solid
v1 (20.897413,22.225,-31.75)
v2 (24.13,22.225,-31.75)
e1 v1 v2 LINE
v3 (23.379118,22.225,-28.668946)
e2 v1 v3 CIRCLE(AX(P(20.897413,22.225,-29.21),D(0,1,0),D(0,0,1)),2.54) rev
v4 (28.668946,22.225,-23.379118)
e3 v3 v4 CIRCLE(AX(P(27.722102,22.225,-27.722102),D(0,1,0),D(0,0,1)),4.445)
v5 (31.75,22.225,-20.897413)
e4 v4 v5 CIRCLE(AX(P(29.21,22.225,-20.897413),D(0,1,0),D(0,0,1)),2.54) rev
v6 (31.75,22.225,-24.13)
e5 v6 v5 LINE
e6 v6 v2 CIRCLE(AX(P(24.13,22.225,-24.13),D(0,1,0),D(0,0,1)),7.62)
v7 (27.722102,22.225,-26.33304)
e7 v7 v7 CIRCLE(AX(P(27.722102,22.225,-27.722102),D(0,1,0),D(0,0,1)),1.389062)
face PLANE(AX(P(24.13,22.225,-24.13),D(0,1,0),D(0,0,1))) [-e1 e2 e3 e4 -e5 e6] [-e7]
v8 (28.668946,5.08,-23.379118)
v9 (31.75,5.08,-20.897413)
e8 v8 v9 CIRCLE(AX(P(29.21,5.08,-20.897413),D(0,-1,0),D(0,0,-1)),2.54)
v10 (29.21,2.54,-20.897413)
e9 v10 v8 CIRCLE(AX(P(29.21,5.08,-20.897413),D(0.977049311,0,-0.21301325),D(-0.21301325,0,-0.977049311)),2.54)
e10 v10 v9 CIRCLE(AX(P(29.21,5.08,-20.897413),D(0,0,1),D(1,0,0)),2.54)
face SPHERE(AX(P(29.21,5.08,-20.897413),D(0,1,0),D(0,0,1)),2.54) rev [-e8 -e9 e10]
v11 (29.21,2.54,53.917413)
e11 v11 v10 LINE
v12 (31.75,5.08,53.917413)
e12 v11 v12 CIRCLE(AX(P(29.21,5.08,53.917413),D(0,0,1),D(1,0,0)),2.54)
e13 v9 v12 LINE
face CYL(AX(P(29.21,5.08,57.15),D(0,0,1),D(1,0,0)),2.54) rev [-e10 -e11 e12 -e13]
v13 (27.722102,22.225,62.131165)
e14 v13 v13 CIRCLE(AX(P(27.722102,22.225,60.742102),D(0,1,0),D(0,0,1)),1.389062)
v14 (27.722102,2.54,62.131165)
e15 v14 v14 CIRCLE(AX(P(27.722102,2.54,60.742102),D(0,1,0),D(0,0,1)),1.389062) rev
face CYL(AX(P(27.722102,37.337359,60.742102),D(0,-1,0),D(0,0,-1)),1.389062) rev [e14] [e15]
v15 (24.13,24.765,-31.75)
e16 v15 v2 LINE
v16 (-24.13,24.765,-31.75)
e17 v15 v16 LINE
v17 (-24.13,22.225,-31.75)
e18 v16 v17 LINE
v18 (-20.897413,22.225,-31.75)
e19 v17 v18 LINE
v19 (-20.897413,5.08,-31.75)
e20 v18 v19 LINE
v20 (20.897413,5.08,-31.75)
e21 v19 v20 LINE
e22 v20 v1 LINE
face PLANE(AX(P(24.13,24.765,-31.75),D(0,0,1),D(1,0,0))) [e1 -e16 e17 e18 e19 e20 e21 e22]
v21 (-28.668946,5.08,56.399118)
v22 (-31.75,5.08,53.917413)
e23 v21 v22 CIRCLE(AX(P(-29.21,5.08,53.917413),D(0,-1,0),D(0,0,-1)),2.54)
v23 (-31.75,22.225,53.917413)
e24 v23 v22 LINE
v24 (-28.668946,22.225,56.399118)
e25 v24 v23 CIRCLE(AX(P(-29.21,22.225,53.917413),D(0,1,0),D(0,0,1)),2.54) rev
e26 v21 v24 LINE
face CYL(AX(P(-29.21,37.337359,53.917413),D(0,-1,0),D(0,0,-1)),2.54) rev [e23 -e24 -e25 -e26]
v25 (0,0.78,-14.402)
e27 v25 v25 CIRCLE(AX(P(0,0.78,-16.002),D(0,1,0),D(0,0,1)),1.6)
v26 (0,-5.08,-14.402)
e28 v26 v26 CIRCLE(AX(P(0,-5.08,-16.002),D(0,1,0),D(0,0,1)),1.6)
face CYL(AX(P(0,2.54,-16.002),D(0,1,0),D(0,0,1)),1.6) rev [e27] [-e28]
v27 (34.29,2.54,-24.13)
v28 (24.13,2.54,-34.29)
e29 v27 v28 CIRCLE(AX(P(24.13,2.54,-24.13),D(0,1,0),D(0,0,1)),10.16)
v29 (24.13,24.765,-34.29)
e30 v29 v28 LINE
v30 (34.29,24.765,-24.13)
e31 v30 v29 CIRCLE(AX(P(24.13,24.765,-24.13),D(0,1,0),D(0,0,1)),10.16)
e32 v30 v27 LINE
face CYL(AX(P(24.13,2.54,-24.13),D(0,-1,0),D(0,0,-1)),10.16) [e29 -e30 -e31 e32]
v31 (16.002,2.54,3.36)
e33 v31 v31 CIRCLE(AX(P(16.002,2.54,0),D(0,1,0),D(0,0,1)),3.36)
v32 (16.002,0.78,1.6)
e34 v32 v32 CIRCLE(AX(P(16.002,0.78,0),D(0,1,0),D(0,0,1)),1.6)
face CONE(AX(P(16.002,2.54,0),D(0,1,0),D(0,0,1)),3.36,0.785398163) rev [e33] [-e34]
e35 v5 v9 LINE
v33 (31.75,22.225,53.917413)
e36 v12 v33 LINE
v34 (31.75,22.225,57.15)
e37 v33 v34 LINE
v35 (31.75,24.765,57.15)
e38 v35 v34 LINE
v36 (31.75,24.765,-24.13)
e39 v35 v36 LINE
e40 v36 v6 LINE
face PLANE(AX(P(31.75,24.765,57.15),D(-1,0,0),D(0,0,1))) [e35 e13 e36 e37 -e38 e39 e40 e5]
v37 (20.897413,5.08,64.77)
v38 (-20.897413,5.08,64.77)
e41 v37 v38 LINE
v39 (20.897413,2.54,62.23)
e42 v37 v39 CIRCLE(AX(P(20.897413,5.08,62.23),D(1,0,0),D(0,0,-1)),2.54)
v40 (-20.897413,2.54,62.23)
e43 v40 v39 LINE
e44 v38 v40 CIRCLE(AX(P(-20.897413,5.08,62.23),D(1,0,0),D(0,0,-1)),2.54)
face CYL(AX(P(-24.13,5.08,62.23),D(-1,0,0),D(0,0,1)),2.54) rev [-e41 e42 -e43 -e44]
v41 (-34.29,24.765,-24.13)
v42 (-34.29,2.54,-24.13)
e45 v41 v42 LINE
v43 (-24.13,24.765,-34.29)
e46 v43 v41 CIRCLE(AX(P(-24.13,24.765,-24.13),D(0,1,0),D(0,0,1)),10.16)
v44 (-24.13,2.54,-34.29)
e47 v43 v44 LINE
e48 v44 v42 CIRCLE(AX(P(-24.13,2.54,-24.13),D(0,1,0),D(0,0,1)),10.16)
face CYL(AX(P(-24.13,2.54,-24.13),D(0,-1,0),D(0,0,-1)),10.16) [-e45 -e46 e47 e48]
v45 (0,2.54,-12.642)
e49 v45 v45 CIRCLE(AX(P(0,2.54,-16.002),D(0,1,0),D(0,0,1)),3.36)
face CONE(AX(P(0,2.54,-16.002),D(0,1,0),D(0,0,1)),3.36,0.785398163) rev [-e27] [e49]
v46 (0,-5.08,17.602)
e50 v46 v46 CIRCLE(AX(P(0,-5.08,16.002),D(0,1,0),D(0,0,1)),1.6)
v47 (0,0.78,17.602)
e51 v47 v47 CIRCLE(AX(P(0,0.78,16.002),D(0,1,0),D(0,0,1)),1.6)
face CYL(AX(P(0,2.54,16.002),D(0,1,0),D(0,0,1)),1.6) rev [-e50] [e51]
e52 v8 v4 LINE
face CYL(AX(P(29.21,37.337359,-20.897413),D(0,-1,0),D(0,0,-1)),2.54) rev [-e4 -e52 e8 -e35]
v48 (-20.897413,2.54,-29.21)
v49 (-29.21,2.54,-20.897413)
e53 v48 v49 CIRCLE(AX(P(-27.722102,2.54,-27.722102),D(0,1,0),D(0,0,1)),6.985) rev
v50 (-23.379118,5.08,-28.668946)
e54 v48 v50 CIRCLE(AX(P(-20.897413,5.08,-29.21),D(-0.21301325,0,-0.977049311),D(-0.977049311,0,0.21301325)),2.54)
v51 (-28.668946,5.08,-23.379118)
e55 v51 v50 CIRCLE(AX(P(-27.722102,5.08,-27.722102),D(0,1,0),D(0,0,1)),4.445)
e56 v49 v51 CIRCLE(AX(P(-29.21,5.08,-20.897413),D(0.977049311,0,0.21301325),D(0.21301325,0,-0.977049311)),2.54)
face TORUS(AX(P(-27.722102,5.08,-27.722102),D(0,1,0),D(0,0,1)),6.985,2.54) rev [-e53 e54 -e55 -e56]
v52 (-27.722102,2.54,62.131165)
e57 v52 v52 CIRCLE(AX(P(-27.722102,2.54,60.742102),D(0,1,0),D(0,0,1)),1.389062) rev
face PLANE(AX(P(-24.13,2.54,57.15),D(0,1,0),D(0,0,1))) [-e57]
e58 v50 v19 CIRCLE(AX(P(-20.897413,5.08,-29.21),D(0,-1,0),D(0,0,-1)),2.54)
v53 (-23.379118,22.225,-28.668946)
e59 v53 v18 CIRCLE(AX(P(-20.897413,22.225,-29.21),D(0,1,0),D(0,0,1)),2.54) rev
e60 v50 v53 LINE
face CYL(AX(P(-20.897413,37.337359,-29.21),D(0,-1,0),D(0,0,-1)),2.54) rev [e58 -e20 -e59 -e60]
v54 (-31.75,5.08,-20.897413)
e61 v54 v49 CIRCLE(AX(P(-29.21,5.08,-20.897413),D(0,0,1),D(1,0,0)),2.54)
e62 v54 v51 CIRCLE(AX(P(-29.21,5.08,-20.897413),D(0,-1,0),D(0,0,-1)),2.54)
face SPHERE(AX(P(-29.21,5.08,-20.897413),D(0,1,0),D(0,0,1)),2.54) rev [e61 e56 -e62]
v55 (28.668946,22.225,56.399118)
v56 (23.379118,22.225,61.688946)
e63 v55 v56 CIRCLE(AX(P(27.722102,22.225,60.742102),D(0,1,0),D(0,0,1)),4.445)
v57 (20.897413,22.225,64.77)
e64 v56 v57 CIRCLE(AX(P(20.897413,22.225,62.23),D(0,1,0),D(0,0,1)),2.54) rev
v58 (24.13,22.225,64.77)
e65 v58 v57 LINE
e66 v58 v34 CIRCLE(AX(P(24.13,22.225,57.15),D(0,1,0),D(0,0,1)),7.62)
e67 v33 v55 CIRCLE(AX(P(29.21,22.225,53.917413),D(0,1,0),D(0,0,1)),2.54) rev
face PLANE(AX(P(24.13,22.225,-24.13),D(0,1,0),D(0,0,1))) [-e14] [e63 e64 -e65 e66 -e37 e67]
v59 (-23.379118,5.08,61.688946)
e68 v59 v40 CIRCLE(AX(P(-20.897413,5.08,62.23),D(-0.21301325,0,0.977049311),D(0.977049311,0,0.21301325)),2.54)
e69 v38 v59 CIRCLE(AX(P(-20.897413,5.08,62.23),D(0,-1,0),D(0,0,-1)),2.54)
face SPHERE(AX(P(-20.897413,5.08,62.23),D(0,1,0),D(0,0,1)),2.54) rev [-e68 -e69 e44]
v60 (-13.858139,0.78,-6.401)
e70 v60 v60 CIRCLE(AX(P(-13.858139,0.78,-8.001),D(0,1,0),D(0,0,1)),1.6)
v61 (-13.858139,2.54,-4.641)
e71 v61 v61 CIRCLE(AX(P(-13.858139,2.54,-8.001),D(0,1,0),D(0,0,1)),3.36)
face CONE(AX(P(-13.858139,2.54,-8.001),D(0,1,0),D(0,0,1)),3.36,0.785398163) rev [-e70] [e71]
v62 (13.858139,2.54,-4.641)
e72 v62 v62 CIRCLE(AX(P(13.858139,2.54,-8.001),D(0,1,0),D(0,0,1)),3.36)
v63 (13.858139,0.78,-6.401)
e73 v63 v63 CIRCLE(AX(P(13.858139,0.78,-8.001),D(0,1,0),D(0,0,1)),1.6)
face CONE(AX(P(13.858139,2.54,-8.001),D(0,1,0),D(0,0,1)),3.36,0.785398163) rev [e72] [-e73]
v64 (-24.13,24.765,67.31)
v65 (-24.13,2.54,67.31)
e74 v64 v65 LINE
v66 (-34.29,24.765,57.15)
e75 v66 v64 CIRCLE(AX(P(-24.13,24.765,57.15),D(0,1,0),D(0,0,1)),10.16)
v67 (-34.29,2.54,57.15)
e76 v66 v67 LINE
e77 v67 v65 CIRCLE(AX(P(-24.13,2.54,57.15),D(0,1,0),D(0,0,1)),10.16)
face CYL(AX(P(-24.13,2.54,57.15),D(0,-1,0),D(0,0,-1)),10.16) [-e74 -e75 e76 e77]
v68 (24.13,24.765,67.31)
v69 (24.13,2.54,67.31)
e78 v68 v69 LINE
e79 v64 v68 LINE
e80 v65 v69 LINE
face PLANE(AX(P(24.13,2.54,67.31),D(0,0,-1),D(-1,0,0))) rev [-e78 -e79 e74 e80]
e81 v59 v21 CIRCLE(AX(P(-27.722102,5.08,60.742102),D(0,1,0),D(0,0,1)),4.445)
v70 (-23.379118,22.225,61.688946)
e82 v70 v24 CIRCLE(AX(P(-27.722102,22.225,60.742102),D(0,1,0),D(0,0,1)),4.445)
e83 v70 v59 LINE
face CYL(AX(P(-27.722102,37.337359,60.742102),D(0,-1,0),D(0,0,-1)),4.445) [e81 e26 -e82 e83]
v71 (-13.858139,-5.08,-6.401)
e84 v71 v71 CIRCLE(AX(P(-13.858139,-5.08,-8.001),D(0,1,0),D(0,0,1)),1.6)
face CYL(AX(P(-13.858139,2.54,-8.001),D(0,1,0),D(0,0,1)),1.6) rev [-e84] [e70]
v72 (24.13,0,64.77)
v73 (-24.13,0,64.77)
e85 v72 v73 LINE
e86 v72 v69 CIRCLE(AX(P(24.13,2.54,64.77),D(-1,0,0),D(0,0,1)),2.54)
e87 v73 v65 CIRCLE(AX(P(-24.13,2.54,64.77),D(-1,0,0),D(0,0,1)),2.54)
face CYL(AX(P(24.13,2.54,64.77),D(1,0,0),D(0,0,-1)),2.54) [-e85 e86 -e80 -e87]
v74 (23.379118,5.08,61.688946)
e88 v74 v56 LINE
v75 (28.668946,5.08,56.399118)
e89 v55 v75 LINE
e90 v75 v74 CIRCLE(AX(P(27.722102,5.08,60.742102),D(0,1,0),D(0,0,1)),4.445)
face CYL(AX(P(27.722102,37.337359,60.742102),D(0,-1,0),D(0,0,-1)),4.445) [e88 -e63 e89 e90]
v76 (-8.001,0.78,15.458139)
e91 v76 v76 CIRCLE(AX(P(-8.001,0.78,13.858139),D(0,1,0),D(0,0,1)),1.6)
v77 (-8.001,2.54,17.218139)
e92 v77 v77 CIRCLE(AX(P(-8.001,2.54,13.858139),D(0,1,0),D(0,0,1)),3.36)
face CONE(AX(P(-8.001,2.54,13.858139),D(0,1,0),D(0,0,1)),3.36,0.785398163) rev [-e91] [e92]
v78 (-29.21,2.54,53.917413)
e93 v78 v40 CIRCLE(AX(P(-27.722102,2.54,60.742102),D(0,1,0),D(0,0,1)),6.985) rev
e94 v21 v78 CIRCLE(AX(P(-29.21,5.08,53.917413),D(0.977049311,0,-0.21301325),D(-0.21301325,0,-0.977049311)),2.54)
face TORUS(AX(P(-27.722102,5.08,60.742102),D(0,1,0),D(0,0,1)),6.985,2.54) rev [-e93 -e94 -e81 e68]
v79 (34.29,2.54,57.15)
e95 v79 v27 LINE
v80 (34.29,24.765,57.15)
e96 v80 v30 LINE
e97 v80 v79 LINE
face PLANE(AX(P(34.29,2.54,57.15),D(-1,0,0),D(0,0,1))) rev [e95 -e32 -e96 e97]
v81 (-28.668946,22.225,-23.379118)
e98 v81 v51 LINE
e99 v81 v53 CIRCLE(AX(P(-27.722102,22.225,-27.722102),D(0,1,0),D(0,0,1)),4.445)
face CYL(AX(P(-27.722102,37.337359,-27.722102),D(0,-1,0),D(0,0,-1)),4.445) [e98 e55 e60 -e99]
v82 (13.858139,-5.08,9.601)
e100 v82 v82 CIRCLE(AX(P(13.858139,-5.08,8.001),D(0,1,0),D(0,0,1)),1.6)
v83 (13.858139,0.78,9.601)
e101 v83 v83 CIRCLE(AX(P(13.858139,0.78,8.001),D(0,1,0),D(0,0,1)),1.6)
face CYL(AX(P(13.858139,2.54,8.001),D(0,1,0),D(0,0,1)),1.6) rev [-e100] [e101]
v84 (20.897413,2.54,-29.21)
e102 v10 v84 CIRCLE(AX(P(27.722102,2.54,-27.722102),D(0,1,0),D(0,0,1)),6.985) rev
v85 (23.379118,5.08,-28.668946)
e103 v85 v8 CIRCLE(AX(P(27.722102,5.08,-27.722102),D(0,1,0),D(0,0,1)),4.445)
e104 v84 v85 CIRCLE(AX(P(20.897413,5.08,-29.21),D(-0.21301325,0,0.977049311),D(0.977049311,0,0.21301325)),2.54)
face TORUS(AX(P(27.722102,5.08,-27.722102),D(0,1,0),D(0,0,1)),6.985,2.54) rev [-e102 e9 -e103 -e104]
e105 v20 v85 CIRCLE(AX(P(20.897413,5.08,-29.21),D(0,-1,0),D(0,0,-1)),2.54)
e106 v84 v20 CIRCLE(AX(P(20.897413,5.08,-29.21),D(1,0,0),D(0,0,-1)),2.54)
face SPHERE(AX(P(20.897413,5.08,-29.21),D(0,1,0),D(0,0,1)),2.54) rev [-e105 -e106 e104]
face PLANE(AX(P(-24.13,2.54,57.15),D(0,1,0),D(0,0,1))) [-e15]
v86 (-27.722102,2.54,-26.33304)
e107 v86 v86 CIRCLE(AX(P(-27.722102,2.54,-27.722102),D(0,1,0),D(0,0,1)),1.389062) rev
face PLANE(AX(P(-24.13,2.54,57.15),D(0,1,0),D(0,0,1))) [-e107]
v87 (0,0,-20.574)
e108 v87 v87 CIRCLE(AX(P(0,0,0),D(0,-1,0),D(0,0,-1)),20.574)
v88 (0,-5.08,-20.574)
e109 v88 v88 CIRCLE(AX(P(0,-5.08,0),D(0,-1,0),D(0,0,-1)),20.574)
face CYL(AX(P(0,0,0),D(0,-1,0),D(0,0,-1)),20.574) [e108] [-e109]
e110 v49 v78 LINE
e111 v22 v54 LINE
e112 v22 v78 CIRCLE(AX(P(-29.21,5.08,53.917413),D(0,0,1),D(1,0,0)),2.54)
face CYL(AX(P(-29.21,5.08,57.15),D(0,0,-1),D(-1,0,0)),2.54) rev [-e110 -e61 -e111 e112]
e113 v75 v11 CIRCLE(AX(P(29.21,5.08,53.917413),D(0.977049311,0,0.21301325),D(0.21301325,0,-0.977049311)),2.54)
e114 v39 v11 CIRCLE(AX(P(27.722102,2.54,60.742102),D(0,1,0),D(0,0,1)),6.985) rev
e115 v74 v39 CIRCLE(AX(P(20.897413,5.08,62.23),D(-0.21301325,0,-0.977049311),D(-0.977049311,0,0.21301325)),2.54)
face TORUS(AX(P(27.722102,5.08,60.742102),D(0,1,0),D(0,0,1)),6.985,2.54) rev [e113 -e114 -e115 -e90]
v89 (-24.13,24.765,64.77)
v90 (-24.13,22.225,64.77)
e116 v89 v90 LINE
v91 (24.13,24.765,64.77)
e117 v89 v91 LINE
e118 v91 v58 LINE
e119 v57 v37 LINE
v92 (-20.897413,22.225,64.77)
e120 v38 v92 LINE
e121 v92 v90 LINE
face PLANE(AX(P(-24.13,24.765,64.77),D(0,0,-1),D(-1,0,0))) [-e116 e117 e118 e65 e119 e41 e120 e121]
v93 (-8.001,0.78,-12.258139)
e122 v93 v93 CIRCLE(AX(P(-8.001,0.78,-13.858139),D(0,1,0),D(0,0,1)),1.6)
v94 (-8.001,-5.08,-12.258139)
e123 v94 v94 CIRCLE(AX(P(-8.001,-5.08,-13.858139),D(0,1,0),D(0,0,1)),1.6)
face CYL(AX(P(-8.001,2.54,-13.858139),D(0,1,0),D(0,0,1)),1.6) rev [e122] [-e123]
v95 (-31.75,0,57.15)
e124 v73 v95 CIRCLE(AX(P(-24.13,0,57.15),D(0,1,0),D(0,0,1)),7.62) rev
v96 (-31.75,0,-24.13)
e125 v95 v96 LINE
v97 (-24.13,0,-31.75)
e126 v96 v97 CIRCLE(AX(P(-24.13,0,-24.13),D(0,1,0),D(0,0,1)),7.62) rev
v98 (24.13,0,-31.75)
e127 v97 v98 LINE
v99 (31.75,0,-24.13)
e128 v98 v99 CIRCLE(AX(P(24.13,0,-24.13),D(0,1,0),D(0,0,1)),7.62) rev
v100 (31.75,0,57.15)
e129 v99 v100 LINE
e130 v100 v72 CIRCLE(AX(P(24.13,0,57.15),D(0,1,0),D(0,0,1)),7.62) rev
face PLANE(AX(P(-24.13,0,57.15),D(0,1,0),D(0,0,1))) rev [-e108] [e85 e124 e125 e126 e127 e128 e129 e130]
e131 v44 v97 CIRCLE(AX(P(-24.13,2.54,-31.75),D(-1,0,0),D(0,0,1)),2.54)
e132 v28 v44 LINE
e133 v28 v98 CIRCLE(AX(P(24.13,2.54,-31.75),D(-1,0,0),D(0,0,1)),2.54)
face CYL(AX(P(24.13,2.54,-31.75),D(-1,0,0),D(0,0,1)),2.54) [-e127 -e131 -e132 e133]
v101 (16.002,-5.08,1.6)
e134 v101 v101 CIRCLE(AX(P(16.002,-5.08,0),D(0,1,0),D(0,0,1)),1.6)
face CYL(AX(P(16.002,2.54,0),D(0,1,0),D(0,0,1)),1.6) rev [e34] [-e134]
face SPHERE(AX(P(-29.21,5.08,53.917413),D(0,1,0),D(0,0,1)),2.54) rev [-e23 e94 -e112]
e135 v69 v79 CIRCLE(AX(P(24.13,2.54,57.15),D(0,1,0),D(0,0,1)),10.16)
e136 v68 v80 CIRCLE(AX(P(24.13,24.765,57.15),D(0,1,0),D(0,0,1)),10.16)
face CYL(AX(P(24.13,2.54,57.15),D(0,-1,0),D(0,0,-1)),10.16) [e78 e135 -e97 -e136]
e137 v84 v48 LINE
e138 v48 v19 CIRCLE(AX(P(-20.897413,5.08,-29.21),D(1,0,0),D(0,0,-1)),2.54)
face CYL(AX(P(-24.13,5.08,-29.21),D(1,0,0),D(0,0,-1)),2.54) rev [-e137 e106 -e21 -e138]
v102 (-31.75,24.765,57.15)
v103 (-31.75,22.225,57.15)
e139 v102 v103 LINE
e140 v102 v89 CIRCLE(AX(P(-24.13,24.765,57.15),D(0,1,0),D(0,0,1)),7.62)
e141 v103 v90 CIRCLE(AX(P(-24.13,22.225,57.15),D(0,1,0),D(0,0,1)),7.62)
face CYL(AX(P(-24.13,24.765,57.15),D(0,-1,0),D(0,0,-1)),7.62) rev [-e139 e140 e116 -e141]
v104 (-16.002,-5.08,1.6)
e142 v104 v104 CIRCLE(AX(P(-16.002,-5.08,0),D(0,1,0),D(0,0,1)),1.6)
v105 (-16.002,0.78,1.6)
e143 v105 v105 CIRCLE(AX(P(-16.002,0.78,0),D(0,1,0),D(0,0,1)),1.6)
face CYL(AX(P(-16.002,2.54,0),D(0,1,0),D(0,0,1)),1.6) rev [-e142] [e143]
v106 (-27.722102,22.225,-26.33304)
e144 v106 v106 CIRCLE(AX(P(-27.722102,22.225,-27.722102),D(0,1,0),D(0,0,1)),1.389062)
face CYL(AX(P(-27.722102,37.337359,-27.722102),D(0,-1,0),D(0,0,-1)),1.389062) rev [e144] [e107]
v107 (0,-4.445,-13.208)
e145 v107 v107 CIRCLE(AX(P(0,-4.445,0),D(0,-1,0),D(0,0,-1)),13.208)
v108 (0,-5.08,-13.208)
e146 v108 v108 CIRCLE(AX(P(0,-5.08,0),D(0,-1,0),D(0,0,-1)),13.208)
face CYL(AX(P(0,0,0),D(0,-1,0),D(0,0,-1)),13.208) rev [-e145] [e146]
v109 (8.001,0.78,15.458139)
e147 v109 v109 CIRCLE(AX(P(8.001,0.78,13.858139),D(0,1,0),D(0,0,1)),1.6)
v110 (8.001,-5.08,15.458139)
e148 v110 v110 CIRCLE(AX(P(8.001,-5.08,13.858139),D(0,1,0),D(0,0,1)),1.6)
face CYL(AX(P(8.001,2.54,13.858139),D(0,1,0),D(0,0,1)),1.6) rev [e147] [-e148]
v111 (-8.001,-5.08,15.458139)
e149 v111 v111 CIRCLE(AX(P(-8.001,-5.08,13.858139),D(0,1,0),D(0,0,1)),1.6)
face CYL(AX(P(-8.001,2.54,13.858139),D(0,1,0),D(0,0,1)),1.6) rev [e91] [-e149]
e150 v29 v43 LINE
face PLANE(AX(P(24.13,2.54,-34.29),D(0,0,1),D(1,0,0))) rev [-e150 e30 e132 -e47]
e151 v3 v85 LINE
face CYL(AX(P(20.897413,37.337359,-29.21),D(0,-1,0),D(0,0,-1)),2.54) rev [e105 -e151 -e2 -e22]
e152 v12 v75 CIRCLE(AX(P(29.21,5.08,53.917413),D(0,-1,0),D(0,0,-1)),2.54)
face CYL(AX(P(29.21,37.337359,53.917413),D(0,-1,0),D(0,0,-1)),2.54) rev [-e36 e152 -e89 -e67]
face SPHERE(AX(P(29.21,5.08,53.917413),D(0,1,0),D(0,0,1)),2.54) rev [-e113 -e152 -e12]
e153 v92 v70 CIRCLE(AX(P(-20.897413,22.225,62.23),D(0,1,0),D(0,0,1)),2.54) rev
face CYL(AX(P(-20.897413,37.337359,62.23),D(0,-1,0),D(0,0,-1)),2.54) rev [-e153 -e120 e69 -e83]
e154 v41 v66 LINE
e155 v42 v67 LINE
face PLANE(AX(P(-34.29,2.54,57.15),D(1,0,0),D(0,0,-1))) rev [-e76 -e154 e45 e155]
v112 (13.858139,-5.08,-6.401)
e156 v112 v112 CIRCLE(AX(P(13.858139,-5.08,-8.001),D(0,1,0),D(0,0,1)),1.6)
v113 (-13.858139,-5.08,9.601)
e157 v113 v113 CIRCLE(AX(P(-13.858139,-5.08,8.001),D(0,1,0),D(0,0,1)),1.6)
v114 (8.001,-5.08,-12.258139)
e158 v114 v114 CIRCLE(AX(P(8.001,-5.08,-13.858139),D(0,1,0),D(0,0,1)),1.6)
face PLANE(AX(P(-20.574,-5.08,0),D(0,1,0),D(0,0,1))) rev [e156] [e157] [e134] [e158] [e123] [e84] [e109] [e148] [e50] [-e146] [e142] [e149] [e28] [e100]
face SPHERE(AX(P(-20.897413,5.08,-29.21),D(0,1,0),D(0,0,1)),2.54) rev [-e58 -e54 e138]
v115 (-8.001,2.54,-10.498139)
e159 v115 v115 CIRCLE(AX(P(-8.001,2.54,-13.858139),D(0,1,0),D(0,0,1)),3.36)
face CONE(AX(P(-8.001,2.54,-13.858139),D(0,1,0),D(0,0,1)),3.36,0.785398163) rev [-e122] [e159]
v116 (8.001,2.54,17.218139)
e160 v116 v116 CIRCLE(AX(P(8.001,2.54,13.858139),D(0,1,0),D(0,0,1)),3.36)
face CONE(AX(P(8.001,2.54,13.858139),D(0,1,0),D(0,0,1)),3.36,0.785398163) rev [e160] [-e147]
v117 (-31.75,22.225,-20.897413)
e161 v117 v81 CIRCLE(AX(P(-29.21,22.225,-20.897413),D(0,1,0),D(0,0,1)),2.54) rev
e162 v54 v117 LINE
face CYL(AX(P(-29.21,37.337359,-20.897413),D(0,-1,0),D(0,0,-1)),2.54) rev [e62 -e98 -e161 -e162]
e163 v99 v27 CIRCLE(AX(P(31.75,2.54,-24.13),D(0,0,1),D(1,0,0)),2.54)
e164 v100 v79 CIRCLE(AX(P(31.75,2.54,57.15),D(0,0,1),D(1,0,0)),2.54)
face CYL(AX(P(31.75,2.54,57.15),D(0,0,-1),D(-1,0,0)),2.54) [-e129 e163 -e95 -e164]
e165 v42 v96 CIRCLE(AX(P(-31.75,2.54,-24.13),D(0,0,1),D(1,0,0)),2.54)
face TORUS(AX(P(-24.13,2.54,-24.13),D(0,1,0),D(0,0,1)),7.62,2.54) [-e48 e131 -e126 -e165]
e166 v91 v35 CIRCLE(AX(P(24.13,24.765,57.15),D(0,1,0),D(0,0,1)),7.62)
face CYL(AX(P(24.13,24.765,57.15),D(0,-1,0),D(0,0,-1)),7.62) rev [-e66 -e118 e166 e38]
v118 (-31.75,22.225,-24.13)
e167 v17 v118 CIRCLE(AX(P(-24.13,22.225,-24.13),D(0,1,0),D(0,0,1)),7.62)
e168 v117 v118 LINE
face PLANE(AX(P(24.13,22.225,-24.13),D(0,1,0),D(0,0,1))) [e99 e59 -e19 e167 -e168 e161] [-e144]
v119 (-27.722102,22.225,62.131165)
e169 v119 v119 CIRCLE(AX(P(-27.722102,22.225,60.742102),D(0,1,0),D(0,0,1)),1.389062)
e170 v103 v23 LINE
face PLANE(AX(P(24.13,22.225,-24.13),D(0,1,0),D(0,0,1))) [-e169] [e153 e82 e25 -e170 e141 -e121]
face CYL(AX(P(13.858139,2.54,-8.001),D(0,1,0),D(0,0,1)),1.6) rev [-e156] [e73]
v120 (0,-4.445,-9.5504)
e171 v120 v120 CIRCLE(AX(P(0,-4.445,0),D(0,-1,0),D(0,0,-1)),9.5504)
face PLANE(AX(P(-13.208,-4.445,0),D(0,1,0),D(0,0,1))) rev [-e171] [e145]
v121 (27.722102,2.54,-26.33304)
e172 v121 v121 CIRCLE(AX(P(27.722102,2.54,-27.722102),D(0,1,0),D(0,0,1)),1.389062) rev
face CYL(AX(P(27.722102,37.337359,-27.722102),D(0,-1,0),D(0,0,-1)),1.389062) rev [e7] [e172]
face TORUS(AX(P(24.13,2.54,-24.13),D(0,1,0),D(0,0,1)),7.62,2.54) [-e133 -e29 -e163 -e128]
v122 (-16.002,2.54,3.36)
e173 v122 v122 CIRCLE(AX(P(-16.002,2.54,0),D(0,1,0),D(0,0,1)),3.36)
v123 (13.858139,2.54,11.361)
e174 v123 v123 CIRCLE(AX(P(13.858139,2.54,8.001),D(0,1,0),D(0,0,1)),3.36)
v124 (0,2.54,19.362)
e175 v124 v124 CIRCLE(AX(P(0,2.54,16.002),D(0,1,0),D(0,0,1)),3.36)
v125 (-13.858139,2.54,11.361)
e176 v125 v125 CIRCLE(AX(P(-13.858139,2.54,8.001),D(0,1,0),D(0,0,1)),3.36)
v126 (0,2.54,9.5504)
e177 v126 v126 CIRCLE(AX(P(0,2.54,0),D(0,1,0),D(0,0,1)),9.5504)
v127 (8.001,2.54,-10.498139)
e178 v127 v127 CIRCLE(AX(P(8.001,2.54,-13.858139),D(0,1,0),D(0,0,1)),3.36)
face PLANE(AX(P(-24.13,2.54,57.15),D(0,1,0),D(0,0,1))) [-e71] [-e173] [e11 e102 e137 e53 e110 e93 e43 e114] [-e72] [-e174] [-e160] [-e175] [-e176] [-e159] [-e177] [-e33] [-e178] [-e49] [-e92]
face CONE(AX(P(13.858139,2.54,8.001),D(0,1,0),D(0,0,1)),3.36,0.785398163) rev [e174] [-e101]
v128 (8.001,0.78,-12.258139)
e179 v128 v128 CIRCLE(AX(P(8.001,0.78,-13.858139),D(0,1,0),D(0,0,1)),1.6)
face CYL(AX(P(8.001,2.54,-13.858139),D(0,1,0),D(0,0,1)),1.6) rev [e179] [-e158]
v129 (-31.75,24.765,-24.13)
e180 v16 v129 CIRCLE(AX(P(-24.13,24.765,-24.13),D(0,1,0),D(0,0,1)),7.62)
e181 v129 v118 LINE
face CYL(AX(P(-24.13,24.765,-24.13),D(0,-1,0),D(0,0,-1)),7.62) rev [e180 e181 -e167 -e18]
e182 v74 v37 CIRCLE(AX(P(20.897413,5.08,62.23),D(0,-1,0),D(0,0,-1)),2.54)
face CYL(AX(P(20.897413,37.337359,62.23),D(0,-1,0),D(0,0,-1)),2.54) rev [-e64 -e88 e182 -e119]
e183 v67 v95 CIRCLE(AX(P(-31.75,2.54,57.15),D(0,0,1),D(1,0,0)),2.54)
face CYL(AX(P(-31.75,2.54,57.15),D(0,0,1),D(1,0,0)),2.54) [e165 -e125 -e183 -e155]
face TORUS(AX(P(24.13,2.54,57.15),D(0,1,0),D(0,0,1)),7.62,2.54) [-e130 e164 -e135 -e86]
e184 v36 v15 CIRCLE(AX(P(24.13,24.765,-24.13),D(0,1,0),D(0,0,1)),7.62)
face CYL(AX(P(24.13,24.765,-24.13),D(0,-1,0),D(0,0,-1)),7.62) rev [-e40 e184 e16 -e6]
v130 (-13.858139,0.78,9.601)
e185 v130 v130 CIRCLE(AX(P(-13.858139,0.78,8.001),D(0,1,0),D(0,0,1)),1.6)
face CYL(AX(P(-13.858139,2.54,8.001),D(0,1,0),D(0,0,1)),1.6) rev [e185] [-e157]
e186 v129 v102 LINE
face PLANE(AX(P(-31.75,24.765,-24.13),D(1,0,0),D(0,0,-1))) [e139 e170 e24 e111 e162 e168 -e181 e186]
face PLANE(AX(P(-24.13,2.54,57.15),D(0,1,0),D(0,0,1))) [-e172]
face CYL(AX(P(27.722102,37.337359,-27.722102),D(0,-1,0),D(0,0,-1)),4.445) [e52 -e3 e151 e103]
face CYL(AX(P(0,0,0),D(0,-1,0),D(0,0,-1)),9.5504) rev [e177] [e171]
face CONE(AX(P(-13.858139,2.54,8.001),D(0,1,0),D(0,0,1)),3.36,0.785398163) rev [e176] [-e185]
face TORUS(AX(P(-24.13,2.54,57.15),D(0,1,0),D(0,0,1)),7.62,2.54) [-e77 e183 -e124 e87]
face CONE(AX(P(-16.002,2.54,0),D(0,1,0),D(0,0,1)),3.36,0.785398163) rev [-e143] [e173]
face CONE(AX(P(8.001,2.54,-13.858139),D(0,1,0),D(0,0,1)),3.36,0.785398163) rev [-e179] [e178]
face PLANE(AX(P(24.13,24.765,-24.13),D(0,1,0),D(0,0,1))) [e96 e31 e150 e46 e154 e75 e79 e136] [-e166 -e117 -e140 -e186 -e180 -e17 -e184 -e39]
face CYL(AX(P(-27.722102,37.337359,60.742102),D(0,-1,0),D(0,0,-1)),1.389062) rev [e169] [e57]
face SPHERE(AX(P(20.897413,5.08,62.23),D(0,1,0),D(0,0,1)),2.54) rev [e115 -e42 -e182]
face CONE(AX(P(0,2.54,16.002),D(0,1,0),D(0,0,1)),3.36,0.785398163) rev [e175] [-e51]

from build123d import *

# Parameters (mm, degrees)
BOSS_EXTRUDE1_START           = 2.54
SKETCH4_R                     = 9.5504
BOSS_EXTRUDE1_DEPTH           = 2.54
CSK_FOR_M3_SFHCS1_D           = 3.2
CSK_FOR_M3_SFHCS1_CSINK_D     = 6.72
CSK_FOR_M3_SFHCS1_CSINK_ANGLE = 90
BOSS_EXTRUDE4_START           = 22.225
BOSS_EXTRUDE4_DEPTH           = 22.225
FILLET1_R                     = 2.54
SKETCH8_R                     = 4.445
SKETCH8_R_2                   = 1.3890625
BOSS_EXTRUDE5_DEPTH           = 19.685
FILLET3_R                     = 2.54
FILLET4_R                     = 2.54


with BuildPart() as part:
    # Sketch1 → Revolve1 (revolve)
    with BuildSketch(Plane.XY, mode=Mode.PRIVATE) as revolve1_sk:
        Polygon((-9.5504, 0), (-20.574, 0), (-20.574, -5.08), (-13.208, -5.08), (-13.208, -4.445), (-9.5504, -4.445), align=None)
    revolve(revolve1_sk.sketch.rotate(Axis((0, 0, 0), (0, 1, 0)), 270), axis=Axis((0, 0, 0), (0, 1, 0)))

    # Sketch4 → Boss-Extrude1 (add)
    with BuildSketch(Plane(origin=(0, 0, 0), x_dir=(1, 0, 0), z_dir=(0, 1, 0)).offset(BOSS_EXTRUDE1_START)):
        with BuildLine():
            Line((-24.13, -67.31), (24.13, -67.31))
            ThreePointArc((24.13, -67.31), (31.314204897, -64.334204897), (34.29, -57.15))
            Line((34.29, -57.15), (34.29, 24.13))
            ThreePointArc((34.29, 24.13), (31.314204897, 31.314204897), (24.13, 34.29))
            Line((24.13, 34.29), (-24.13, 34.29))
            ThreePointArc((-24.13, 34.29), (-31.314204897, 31.314204897), (-34.29, 24.13))
            Line((-34.29, 24.13), (-34.29, -57.15))
            ThreePointArc((-34.29, -57.15), (-31.314204897, -64.334204897), (-24.13, -67.31))
        make_face()
        Circle(SKETCH4_R, mode=Mode.SUBTRACT)
    extrude(amount=-BOSS_EXTRUDE1_DEPTH)

    # CSK for M3 SFHCS1 (through all)
    with Locations(Plane(origin=(0, 2.54, 0), x_dir=(1, 0, 0), z_dir=(0, 1, 0))):
        with Locations((-13.858138511, -8.001), (-16.002, 0), (-13.858138511, 8.001), (-8.001, 13.858138511), (0, 16.002), (8.001, 13.858138511), (13.858138511, 8.001), (16.002, 0), (13.858138511, -8.001), (8.001, -13.858138511), (0, -16.002), (-8.001, -13.858138511)):
            CounterSinkHole(CSK_FOR_M3_SFHCS1_D / 2, CSK_FOR_M3_SFHCS1_CSINK_D / 2, counter_sink_angle=CSK_FOR_M3_SFHCS1_CSINK_ANGLE)

    # Sketch6 → Boss-Extrude4 (add)
    with BuildSketch(Plane(origin=(0, 2.54, 0), x_dir=(1, 0, 0), z_dir=(0, 1, 0)).offset(BOSS_EXTRUDE4_START)):
        with BuildLine():
            Line((24.13, 34.29), (-24.13, 34.29))
            ThreePointArc((-24.13, 34.29), (-31.314204897, 31.314204897), (-34.29, 24.13))
            Line((-34.29, 24.13), (-34.29, -57.15))
            ThreePointArc((-34.29, -57.15), (-31.314204897, -64.334204897), (-24.13, -67.31))
            Line((-24.13, -67.31), (24.13, -67.31))
            ThreePointArc((24.13, -67.31), (31.314204897, -64.334204897), (34.29, -57.15))
            Line((34.29, -57.15), (34.29, 24.13))
            ThreePointArc((34.29, 24.13), (31.314204897, 31.314204897), (24.13, 34.29))
        make_face()
        with BuildLine():
            Line((24.13, 31.75), (-24.13, 31.75))
            ThreePointArc((-24.13, 31.75), (-29.518153673, 29.518153673), (-31.75, 24.13))
            Line((-31.75, 24.13), (-31.75, -57.15))
            ThreePointArc((-31.75, -57.15), (-29.518153673, -62.538153673), (-24.13, -64.77))
            Line((-24.13, -64.77), (24.13, -64.77))
            ThreePointArc((24.13, -64.77), (29.518153673, -62.538153673), (31.75, -57.15))
            Line((31.75, -57.15), (31.75, 24.13))
            ThreePointArc((31.75, 24.13), (29.518153673, 29.518153673), (24.13, 31.75))
        make_face(mode=Mode.SUBTRACT)
    extrude(amount=-BOSS_EXTRUDE4_DEPTH)

    # Fillet1
    fillet1_edges = [part.edges().sort_by_distance(p)[0] for p in [
        (-31.314204897, 0, 64.334204897),
        (0, 0, 67.31),
        (31.314204897, 0, 64.334204897),
        (34.29, 0, 16.51),
        (31.314204897, 0, -31.314204897),
        (0, 0, -34.29),
        (-31.314204897, 0, -31.314204897),
        (-34.29, 0, 16.51),
    ]]
    fillet(fillet1_edges, radius=FILLET1_R)

    # Sketch8 → Boss-Extrude5 (add)
    # profile 1 of 4: a face of its own
    with BuildSketch(Plane(origin=(0, 2.54, 0), x_dir=(1, 0, 0), z_dir=(0, 1, 0))):
        with Locations((-27.722102448, -60.742102448)):
            Circle(SKETCH8_R)
        with Locations(Location((-27.722102448, -60.742102448, 0), (0, 0, 270))):
            Circle(SKETCH8_R_2, mode=Mode.SUBTRACT)
    # profile 2 of 4: a face of its own
    with BuildSketch(Plane(origin=(0, 2.54, 0), x_dir=(1, 0, 0), z_dir=(0, 1, 0))):
        with Locations((27.722102448, -60.742102448)):
            Circle(SKETCH8_R)
        with Locations(Location((27.722102448, -60.742102448, 0), (0, 0, 270))):
            Circle(SKETCH8_R_2, mode=Mode.SUBTRACT)
    # profile 3 of 4: a face of its own
    with BuildSketch(Plane(origin=(0, 2.54, 0), x_dir=(1, 0, 0), z_dir=(0, 1, 0))):
        with Locations((27.722102448, 27.722102448)):
            Circle(SKETCH8_R)
        with Locations(Location((27.722102448, 27.722102448, 0), (0, 0, 270))):
            Circle(SKETCH8_R_2, mode=Mode.SUBTRACT)
    # profile 4 of 4: a face of its own
    with BuildSketch(Plane(origin=(0, 2.54, 0), x_dir=(1, 0, 0), z_dir=(0, 1, 0))):
        with Locations((-27.722102448, 27.722102448)):
            Circle(SKETCH8_R)
        with Locations(Location((-27.722102448, 27.722102448, 0), (0, 0, 270))):
            Circle(SKETCH8_R_2, mode=Mode.SUBTRACT)
    extrude(amount=BOSS_EXTRUDE5_DEPTH)

    # Fillet3
    # the kernel refuses this fillet: 2.54 mm, written as the material it adds along each edge
    with BuildSketch(Plane(origin=(25.571770391, 2.54, 64.632359129), x_dir=(-0.5973974080073474, 0, -0.8019453453360166), z_dir=(0, 1, 0)), Plane(origin=(31.612359129, 2.54, -25.571770391), x_dir=(-0.8019453453360167, 0, 0.5973974080073472), z_dir=(0, 1, 0)), Plane(origin=(-25.571770391, 2.54, -31.612359129), x_dir=(0.5973974080073424, 0, 0.8019453453360202), z_dir=(0, 1, 0)), Plane(origin=(-31.612359129, 2.54, 58.591770391), x_dir=(0.8019453453360194, 0, -0.5973974080073438), z_dir=(0, 1, 0))) as fillet3_piece_1:
        with BuildLine():
            CenterArc((4.719009703, 2.313416024), FILLET3_R, 143.316272758, 102.298995101)
            Line((2.682068526, 3.83080544), (2.478374408, 3.982544382))
            ThreePointArc((2.478374408, 3.982544382), (0.547235321, 1.390186295), (-0.228725099, 0.110457363))
            Line((-0.228725099, 0.110457363), (0.104866882, -0.231341602))
            ThreePointArc((0.104866882, -0.231341602), (1.83517044, 0.142521958), (3.565473998, -0.231341602))
            Line((3.565473998, -0.231341602), (3.67034088, 0))
        make_face()
    extrude(amount=19.685)
    with BuildSketch(Plane(origin=(31.612359129, 2.54, 58.591770391), x_dir=(-0.8019453453360176, 0, -0.5973974080073462), z_dir=(0, 1, 0)), Plane(origin=(25.571770391, 2.54, -31.612359129), x_dir=(-0.5973974080073442, 0, 0.801945345336019), z_dir=(0, 1, 0)), Plane(origin=(-31.612359129, 2.54, -25.571770391), x_dir=(0.8019453453360176, 0, 0.5973974080073461), z_dir=(0, 1, 0)), Plane(origin=(-25.571770391, 2.54, 64.632359129), x_dir=(0.5973974080073453, 0, -0.8019453453360182), z_dir=(0, 1, 0))) as fillet3_piece_2:
        with BuildLine():
            CenterArc((4.719009703, -2.313416024), FILLET3_R, 114.384732141, 102.298995101)
            Line((2.682068526, -3.83080544), (2.478374408, -3.982544382))
            ThreePointArc((2.478374408, -3.982544382), (0.547235321, -1.390186295), (-0.228725099, -0.110457363))
            Line((-0.228725099, -0.110457363), (0.104866882, 0.231341602))
            ThreePointArc((0.104866882, 0.231341602), (1.83517044, -0.142521958), (3.565473998, 0.231341602))
            Line((3.565473998, 0.231341602), (3.67034088, 0))
        make_face()
    extrude(amount=19.685)

    # Fillet4
    fillet4_edges = [part.edges().sort_by_distance(p)[0] for p in [
        (0, 2.54, 64.77),
        (-24.579012806, 2.54, -24.579012806),
        (-31.75, 2.54, 16.51),
        (-24.579012806, 2.54, 57.599012806),
        (24.579012806, 2.54, 57.599012806),
        (31.75, 2.54, 16.51),
        (24.579012806, 2.54, -24.579012806),
        (0, 2.54, -31.75),
        (-22.875527809, 2.54, 63.823317877),
        (-30.803317877, 2.54, 55.895527809),
        (-22.875527809, 2.54, -30.803317877),
        (-30.803317877, 2.54, -22.875527809),
        (30.803317877, 2.54, -22.875527809),
        (22.875527809, 2.54, -30.803317877),
        (30.803317877, 2.54, 55.895527809),
        (22.875527809, 2.54, 63.823317877),
    ]]
    fillet(fillet4_edges, radius=FILLET4_R)


solid = part.part
